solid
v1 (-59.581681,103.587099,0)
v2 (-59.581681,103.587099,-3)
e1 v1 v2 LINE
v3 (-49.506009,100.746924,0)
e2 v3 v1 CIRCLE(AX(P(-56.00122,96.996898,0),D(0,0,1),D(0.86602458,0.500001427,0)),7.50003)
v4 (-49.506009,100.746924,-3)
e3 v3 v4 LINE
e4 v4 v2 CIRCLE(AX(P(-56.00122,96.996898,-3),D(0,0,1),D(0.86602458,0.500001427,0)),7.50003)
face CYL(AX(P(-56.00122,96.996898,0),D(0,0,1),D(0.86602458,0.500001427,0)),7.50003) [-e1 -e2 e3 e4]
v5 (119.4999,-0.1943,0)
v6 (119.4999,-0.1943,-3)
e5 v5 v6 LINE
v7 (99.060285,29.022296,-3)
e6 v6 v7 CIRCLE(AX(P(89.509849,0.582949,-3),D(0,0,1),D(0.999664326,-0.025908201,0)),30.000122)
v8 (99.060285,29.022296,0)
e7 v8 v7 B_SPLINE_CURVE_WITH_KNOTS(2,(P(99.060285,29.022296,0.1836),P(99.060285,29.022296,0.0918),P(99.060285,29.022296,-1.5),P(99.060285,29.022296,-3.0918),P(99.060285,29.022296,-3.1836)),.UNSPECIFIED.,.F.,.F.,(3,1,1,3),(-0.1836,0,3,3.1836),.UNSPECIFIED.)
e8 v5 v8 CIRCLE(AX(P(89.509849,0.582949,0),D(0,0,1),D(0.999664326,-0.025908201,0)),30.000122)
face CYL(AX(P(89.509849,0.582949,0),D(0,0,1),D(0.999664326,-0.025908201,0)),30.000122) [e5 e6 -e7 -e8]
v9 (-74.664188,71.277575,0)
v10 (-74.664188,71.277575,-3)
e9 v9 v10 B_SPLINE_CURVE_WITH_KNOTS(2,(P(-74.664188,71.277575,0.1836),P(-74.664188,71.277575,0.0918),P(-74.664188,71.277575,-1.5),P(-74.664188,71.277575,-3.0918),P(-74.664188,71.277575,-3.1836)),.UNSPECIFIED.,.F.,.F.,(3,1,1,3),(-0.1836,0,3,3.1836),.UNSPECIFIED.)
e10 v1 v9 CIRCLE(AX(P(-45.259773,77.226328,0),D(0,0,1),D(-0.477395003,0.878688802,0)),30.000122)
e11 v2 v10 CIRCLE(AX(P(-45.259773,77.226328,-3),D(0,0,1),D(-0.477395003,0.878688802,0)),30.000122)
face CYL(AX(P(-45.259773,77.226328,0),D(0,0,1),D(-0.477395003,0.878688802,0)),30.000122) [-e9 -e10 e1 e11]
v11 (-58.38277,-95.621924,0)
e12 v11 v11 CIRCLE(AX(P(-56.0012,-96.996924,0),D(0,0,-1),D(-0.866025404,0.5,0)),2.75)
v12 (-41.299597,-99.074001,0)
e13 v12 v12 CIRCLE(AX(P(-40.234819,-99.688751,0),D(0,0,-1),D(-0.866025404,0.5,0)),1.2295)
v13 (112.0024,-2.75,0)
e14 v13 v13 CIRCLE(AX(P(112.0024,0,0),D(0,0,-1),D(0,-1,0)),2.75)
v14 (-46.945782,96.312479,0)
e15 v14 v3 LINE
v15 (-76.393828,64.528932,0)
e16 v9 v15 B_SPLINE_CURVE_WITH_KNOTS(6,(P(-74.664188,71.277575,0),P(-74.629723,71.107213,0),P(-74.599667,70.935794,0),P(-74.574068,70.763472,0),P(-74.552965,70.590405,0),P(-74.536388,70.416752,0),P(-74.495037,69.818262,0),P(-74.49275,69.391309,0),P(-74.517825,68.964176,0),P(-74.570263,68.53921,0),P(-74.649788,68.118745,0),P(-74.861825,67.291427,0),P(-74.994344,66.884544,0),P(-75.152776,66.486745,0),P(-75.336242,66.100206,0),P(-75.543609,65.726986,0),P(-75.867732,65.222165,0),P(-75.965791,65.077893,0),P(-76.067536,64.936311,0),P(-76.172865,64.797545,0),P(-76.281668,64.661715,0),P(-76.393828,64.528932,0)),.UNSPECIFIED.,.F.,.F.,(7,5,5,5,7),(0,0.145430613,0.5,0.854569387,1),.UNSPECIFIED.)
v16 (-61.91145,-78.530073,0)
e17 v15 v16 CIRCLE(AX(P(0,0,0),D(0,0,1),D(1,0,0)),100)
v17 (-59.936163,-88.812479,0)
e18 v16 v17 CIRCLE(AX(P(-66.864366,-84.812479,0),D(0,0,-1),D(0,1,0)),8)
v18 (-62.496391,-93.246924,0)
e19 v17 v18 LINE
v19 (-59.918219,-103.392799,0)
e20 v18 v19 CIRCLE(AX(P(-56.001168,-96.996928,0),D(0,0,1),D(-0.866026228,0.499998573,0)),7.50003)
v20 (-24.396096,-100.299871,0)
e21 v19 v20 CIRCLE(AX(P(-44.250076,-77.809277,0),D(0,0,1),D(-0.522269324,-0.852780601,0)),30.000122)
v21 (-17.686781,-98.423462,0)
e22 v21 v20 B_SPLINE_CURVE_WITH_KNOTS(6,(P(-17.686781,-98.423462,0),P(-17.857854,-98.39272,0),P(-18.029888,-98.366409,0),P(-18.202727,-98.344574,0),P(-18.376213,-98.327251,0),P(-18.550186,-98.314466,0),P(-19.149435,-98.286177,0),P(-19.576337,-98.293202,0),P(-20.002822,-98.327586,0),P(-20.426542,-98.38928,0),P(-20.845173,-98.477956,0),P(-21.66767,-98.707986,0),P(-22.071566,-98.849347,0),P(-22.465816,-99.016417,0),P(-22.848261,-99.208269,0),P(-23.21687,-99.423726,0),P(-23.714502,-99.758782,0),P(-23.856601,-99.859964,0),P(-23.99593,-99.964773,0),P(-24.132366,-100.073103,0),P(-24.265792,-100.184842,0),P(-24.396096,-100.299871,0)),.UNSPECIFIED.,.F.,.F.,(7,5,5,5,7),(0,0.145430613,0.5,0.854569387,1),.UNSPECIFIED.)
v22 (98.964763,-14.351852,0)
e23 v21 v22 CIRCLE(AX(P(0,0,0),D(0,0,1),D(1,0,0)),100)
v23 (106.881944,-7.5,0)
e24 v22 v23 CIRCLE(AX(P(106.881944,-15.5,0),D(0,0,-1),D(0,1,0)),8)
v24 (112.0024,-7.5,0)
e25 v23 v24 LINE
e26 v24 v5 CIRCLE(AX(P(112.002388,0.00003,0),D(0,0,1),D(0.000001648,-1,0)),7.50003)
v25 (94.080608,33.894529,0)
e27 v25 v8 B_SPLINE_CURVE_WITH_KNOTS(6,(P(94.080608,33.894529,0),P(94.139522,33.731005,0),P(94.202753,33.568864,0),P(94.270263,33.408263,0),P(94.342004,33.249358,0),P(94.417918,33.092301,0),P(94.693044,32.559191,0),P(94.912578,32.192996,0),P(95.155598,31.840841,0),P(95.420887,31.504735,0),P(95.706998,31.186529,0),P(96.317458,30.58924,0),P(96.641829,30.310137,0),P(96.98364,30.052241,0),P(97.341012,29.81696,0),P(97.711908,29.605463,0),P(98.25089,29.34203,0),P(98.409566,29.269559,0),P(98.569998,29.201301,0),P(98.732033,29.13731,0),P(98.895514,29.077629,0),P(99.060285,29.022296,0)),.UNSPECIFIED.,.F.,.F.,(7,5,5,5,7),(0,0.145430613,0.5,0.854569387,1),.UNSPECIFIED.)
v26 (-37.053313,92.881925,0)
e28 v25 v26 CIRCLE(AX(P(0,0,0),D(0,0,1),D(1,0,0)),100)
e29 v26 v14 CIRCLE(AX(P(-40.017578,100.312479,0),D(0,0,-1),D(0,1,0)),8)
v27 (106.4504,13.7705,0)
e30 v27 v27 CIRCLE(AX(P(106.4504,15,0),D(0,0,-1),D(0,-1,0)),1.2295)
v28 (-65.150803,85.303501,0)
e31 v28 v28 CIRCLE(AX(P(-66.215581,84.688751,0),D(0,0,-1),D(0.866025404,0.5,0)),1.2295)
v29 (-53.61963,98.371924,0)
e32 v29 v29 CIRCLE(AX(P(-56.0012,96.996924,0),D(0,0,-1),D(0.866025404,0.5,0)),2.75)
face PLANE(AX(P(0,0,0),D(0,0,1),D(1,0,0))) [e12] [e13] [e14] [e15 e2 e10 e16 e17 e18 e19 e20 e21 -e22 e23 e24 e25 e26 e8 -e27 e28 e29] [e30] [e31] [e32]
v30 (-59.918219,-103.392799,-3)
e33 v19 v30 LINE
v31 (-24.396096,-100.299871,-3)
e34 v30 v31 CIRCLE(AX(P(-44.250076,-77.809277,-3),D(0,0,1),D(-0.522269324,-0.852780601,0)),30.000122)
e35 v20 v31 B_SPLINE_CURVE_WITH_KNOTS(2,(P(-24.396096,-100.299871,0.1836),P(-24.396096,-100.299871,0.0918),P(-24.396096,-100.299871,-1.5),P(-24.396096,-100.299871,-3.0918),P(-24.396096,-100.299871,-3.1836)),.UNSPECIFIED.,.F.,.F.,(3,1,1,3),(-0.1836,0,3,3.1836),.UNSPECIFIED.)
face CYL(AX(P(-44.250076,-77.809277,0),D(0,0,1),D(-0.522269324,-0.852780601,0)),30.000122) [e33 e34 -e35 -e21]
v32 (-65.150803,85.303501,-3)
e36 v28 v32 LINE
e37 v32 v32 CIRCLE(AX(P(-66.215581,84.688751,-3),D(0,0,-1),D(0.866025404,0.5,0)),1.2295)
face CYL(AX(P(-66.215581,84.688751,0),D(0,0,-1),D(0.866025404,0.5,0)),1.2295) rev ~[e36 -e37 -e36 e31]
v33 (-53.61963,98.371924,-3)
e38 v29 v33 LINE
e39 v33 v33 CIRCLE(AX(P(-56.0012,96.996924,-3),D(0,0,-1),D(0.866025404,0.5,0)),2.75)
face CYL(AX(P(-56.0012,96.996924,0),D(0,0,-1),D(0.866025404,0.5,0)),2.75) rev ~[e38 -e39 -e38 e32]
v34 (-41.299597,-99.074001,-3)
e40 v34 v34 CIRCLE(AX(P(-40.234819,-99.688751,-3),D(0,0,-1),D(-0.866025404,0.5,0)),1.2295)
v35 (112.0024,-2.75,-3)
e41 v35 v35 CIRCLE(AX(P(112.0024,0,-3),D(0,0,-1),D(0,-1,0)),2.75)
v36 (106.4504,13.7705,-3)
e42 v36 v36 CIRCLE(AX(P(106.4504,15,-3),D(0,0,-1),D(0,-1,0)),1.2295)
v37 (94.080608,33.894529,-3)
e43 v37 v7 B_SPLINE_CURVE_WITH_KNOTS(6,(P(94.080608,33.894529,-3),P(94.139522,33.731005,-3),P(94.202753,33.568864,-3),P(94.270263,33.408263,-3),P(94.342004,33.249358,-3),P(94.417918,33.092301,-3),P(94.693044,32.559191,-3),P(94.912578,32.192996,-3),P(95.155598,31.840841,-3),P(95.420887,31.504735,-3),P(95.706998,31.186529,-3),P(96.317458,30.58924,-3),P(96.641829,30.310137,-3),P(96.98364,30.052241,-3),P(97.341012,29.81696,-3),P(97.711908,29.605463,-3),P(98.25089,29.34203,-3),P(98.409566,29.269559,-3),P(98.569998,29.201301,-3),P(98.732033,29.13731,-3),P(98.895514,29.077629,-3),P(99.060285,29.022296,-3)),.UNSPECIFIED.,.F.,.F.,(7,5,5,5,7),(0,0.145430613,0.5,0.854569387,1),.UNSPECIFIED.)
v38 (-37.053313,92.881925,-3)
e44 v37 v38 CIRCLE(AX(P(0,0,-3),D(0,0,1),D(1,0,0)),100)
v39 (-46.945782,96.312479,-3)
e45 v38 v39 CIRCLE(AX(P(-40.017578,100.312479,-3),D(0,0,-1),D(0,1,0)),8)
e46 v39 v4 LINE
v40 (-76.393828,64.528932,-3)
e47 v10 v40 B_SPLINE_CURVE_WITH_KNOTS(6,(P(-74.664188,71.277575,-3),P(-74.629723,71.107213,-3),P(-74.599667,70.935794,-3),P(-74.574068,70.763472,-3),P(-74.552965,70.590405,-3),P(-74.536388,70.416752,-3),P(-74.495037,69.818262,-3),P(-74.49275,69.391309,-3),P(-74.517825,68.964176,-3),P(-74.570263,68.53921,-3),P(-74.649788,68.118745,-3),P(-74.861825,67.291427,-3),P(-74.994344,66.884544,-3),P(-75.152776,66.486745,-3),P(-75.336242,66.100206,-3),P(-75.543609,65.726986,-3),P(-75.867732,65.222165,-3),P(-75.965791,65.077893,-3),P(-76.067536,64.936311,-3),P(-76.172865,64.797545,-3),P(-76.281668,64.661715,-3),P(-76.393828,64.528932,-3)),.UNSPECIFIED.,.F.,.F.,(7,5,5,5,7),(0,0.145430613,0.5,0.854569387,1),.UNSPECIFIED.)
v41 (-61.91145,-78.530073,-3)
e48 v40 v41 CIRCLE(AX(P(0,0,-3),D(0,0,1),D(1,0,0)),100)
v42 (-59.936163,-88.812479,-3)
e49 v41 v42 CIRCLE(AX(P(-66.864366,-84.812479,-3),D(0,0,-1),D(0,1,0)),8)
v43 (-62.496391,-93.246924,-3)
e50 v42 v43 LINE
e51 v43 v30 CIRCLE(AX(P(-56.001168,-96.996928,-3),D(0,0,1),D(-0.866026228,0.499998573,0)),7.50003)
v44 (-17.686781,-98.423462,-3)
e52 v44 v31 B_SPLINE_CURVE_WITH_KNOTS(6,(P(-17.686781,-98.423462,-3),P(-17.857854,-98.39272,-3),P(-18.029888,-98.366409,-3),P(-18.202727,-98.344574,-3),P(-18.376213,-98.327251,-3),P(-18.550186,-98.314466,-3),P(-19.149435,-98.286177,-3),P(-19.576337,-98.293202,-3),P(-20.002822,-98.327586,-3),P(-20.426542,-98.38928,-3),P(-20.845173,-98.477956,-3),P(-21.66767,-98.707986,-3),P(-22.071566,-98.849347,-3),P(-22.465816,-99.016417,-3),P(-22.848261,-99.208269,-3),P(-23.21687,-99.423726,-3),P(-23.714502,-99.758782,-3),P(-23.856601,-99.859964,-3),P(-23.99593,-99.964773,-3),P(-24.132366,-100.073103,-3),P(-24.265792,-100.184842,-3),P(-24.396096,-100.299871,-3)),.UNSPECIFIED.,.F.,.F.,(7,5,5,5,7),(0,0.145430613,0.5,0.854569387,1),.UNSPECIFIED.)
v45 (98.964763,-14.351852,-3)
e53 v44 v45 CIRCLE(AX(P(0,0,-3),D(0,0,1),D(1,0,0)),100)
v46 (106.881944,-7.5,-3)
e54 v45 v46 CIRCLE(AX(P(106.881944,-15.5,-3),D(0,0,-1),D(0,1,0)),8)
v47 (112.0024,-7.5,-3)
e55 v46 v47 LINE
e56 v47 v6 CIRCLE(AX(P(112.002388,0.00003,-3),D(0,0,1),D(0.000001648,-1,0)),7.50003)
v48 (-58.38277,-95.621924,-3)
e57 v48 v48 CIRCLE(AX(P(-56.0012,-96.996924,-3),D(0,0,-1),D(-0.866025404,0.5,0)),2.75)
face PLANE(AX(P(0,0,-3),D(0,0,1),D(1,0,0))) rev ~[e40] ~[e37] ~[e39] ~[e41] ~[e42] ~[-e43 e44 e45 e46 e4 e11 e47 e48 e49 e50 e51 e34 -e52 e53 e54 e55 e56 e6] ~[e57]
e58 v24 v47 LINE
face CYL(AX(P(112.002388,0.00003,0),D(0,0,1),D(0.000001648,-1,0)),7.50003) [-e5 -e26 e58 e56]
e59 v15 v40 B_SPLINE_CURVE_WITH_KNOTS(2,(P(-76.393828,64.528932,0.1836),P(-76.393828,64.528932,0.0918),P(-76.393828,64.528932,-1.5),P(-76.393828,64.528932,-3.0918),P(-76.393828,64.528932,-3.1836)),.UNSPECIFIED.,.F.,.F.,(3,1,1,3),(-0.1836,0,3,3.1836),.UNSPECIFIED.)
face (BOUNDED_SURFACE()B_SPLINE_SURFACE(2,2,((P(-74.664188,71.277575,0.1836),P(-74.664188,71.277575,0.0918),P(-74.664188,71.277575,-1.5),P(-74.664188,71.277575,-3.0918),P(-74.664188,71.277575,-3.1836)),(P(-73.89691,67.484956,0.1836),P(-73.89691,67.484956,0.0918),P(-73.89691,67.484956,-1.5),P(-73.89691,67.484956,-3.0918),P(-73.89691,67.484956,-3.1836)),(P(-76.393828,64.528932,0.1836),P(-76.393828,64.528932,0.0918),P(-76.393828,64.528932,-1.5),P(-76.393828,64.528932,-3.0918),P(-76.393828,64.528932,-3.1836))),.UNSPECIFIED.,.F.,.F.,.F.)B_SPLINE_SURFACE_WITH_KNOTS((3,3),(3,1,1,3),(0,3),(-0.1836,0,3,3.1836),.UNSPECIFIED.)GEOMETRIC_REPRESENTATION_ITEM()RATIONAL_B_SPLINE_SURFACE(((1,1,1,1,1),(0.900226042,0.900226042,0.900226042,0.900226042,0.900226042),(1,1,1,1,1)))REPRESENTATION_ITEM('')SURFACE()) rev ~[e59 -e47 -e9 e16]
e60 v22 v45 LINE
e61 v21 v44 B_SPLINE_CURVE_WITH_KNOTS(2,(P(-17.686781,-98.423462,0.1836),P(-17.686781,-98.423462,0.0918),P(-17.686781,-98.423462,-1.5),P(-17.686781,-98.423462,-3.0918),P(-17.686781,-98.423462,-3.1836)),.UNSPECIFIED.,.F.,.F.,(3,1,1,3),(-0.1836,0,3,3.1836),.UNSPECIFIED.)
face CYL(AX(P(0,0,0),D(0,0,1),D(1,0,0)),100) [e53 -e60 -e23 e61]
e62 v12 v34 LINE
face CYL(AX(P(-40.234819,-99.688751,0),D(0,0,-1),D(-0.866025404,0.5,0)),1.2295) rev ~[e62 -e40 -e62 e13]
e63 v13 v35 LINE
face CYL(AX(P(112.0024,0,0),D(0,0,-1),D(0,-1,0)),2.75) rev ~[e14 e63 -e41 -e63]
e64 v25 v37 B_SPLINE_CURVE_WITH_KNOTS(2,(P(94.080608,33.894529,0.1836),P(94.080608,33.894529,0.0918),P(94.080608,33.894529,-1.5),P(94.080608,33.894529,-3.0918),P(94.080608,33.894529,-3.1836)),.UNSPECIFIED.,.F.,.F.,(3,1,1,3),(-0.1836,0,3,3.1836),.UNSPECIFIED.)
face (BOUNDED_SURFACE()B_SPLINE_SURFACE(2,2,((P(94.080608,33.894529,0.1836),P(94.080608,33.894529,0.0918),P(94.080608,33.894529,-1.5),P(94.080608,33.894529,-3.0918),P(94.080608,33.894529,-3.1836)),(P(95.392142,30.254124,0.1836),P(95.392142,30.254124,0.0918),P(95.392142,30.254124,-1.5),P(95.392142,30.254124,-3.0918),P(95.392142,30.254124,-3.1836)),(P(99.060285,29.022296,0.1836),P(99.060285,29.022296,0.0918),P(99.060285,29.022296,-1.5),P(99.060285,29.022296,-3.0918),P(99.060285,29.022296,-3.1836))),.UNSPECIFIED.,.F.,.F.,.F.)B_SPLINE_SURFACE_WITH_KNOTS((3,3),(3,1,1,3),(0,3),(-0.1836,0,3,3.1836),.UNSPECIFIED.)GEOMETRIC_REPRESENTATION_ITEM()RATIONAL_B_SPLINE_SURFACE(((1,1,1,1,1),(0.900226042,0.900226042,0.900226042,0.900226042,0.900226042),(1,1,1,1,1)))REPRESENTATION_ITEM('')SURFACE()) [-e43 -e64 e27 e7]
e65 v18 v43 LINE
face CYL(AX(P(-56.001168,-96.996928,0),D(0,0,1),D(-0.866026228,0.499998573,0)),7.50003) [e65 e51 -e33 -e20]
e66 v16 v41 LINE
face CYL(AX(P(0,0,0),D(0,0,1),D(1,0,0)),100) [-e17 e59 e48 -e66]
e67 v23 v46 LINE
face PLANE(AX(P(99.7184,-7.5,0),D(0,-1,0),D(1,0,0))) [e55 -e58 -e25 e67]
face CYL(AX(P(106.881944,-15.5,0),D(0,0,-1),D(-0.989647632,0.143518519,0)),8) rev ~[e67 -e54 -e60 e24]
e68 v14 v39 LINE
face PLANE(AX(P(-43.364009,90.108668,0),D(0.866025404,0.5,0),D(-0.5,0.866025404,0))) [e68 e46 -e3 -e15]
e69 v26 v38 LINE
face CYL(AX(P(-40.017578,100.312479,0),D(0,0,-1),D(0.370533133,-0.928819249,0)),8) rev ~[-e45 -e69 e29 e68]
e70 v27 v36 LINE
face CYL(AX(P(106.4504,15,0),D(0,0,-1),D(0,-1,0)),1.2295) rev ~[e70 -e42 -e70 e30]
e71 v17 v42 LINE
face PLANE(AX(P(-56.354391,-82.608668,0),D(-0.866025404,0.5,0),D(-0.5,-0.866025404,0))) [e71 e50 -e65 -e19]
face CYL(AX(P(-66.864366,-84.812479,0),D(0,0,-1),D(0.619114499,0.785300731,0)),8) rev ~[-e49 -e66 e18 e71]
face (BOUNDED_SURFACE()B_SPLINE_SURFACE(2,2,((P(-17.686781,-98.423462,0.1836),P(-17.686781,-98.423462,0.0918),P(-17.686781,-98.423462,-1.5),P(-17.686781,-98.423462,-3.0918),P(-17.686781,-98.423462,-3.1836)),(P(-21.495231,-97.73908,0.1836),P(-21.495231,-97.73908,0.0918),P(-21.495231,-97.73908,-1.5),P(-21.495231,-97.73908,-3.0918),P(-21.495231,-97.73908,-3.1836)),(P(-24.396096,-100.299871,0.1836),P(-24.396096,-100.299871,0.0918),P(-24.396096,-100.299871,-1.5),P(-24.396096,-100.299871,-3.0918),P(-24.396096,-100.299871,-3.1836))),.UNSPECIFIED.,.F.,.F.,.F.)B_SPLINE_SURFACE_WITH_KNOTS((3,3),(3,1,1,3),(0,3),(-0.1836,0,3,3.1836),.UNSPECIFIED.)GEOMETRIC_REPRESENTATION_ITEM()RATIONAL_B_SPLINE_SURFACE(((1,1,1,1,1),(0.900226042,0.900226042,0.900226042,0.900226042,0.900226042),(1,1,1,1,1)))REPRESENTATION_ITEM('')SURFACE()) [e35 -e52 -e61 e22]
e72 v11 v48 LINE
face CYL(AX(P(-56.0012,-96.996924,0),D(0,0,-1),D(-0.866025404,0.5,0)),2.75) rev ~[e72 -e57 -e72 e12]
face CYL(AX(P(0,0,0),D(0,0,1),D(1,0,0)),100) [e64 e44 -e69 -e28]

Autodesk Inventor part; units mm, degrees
ref_plane "YZ Plane" through (0, 0, 0) normal (1, 0, 0) x (0, 1, 0)
ref_plane "XZ Plane" through (0, 0, 0) normal (0, 1, 0) x (-1, 0, 0)
ref_plane "XY Plane" through (0, 0, 0) normal (0, 0, 1) x (1, 0, 0)
sketch "Esquisse2" plane through (0, 0, 0) normal (0, 0, 1) x (1, 0, 0)
  circle A0 centre (0, 0) radius 100
  dimension "Diamètre" = 200
extrude "Embase" add sketch "Esquisse2" against normal blind 3
sketch "Esquisse1" plane through (0, 0, 0) normal (0, 0, 1) x (1, 0, 0)
  arc A0 (99.7184, -7.5) -> (95.3938, 30.0004) centre (0, 0) ccw
  arc A1 (119.4999, -0.1943) -> (95.3938, 30.0004) centre (89.51, 0.583) ccw
  line L0 (99.7184, -7.5) -> (112.0024, -7.5)
  arc A2 (112.0024, -7.5) -> (119.4999, -0.1943) centre (112.0024, 0) ccw
  point P0 (106.4504, 15)
  point P1 (106.4504, 15)
  dimension "d0" = 200
  dimension "d1" = 60
  dimension "d2" = 89.51
  dimension "d3" = 0.583
  dimension "d4" = 7.5
  dimension "d5" = 15
  dimension "d9" = 15
  dimension "d10" = 5.552
extrude "Oreille" add sketch "Esquisse1" against normal up to surface (3 mm away)
hole "M3" at (106.4504, 15, 0) direction (0, 0, -1) diameter 2.459 depth 8.8 tip angle 118 thread size "M3x0.5" class "6H" standard "ISO Metric profile"
hole "Passage vis" at (112.0024, 0, 0) direction (0, 0, -1) diameter 5.5 end through all
fillet "Congé1" radius 8 2 edges at (99.7184, -7.5, -1.5) (95.3938, 30.0004, -1.5)
pattern_circular "Réseau circulaire1" count 3 over 360 about axis through (0, 0, -10) along (0, 0, 1) of "Congé1", "Passage vis", "M3", "Oreille"
equation "\"d0\" = Diamètre"
properties part number "Plateau metalique" material "Aluminium"
